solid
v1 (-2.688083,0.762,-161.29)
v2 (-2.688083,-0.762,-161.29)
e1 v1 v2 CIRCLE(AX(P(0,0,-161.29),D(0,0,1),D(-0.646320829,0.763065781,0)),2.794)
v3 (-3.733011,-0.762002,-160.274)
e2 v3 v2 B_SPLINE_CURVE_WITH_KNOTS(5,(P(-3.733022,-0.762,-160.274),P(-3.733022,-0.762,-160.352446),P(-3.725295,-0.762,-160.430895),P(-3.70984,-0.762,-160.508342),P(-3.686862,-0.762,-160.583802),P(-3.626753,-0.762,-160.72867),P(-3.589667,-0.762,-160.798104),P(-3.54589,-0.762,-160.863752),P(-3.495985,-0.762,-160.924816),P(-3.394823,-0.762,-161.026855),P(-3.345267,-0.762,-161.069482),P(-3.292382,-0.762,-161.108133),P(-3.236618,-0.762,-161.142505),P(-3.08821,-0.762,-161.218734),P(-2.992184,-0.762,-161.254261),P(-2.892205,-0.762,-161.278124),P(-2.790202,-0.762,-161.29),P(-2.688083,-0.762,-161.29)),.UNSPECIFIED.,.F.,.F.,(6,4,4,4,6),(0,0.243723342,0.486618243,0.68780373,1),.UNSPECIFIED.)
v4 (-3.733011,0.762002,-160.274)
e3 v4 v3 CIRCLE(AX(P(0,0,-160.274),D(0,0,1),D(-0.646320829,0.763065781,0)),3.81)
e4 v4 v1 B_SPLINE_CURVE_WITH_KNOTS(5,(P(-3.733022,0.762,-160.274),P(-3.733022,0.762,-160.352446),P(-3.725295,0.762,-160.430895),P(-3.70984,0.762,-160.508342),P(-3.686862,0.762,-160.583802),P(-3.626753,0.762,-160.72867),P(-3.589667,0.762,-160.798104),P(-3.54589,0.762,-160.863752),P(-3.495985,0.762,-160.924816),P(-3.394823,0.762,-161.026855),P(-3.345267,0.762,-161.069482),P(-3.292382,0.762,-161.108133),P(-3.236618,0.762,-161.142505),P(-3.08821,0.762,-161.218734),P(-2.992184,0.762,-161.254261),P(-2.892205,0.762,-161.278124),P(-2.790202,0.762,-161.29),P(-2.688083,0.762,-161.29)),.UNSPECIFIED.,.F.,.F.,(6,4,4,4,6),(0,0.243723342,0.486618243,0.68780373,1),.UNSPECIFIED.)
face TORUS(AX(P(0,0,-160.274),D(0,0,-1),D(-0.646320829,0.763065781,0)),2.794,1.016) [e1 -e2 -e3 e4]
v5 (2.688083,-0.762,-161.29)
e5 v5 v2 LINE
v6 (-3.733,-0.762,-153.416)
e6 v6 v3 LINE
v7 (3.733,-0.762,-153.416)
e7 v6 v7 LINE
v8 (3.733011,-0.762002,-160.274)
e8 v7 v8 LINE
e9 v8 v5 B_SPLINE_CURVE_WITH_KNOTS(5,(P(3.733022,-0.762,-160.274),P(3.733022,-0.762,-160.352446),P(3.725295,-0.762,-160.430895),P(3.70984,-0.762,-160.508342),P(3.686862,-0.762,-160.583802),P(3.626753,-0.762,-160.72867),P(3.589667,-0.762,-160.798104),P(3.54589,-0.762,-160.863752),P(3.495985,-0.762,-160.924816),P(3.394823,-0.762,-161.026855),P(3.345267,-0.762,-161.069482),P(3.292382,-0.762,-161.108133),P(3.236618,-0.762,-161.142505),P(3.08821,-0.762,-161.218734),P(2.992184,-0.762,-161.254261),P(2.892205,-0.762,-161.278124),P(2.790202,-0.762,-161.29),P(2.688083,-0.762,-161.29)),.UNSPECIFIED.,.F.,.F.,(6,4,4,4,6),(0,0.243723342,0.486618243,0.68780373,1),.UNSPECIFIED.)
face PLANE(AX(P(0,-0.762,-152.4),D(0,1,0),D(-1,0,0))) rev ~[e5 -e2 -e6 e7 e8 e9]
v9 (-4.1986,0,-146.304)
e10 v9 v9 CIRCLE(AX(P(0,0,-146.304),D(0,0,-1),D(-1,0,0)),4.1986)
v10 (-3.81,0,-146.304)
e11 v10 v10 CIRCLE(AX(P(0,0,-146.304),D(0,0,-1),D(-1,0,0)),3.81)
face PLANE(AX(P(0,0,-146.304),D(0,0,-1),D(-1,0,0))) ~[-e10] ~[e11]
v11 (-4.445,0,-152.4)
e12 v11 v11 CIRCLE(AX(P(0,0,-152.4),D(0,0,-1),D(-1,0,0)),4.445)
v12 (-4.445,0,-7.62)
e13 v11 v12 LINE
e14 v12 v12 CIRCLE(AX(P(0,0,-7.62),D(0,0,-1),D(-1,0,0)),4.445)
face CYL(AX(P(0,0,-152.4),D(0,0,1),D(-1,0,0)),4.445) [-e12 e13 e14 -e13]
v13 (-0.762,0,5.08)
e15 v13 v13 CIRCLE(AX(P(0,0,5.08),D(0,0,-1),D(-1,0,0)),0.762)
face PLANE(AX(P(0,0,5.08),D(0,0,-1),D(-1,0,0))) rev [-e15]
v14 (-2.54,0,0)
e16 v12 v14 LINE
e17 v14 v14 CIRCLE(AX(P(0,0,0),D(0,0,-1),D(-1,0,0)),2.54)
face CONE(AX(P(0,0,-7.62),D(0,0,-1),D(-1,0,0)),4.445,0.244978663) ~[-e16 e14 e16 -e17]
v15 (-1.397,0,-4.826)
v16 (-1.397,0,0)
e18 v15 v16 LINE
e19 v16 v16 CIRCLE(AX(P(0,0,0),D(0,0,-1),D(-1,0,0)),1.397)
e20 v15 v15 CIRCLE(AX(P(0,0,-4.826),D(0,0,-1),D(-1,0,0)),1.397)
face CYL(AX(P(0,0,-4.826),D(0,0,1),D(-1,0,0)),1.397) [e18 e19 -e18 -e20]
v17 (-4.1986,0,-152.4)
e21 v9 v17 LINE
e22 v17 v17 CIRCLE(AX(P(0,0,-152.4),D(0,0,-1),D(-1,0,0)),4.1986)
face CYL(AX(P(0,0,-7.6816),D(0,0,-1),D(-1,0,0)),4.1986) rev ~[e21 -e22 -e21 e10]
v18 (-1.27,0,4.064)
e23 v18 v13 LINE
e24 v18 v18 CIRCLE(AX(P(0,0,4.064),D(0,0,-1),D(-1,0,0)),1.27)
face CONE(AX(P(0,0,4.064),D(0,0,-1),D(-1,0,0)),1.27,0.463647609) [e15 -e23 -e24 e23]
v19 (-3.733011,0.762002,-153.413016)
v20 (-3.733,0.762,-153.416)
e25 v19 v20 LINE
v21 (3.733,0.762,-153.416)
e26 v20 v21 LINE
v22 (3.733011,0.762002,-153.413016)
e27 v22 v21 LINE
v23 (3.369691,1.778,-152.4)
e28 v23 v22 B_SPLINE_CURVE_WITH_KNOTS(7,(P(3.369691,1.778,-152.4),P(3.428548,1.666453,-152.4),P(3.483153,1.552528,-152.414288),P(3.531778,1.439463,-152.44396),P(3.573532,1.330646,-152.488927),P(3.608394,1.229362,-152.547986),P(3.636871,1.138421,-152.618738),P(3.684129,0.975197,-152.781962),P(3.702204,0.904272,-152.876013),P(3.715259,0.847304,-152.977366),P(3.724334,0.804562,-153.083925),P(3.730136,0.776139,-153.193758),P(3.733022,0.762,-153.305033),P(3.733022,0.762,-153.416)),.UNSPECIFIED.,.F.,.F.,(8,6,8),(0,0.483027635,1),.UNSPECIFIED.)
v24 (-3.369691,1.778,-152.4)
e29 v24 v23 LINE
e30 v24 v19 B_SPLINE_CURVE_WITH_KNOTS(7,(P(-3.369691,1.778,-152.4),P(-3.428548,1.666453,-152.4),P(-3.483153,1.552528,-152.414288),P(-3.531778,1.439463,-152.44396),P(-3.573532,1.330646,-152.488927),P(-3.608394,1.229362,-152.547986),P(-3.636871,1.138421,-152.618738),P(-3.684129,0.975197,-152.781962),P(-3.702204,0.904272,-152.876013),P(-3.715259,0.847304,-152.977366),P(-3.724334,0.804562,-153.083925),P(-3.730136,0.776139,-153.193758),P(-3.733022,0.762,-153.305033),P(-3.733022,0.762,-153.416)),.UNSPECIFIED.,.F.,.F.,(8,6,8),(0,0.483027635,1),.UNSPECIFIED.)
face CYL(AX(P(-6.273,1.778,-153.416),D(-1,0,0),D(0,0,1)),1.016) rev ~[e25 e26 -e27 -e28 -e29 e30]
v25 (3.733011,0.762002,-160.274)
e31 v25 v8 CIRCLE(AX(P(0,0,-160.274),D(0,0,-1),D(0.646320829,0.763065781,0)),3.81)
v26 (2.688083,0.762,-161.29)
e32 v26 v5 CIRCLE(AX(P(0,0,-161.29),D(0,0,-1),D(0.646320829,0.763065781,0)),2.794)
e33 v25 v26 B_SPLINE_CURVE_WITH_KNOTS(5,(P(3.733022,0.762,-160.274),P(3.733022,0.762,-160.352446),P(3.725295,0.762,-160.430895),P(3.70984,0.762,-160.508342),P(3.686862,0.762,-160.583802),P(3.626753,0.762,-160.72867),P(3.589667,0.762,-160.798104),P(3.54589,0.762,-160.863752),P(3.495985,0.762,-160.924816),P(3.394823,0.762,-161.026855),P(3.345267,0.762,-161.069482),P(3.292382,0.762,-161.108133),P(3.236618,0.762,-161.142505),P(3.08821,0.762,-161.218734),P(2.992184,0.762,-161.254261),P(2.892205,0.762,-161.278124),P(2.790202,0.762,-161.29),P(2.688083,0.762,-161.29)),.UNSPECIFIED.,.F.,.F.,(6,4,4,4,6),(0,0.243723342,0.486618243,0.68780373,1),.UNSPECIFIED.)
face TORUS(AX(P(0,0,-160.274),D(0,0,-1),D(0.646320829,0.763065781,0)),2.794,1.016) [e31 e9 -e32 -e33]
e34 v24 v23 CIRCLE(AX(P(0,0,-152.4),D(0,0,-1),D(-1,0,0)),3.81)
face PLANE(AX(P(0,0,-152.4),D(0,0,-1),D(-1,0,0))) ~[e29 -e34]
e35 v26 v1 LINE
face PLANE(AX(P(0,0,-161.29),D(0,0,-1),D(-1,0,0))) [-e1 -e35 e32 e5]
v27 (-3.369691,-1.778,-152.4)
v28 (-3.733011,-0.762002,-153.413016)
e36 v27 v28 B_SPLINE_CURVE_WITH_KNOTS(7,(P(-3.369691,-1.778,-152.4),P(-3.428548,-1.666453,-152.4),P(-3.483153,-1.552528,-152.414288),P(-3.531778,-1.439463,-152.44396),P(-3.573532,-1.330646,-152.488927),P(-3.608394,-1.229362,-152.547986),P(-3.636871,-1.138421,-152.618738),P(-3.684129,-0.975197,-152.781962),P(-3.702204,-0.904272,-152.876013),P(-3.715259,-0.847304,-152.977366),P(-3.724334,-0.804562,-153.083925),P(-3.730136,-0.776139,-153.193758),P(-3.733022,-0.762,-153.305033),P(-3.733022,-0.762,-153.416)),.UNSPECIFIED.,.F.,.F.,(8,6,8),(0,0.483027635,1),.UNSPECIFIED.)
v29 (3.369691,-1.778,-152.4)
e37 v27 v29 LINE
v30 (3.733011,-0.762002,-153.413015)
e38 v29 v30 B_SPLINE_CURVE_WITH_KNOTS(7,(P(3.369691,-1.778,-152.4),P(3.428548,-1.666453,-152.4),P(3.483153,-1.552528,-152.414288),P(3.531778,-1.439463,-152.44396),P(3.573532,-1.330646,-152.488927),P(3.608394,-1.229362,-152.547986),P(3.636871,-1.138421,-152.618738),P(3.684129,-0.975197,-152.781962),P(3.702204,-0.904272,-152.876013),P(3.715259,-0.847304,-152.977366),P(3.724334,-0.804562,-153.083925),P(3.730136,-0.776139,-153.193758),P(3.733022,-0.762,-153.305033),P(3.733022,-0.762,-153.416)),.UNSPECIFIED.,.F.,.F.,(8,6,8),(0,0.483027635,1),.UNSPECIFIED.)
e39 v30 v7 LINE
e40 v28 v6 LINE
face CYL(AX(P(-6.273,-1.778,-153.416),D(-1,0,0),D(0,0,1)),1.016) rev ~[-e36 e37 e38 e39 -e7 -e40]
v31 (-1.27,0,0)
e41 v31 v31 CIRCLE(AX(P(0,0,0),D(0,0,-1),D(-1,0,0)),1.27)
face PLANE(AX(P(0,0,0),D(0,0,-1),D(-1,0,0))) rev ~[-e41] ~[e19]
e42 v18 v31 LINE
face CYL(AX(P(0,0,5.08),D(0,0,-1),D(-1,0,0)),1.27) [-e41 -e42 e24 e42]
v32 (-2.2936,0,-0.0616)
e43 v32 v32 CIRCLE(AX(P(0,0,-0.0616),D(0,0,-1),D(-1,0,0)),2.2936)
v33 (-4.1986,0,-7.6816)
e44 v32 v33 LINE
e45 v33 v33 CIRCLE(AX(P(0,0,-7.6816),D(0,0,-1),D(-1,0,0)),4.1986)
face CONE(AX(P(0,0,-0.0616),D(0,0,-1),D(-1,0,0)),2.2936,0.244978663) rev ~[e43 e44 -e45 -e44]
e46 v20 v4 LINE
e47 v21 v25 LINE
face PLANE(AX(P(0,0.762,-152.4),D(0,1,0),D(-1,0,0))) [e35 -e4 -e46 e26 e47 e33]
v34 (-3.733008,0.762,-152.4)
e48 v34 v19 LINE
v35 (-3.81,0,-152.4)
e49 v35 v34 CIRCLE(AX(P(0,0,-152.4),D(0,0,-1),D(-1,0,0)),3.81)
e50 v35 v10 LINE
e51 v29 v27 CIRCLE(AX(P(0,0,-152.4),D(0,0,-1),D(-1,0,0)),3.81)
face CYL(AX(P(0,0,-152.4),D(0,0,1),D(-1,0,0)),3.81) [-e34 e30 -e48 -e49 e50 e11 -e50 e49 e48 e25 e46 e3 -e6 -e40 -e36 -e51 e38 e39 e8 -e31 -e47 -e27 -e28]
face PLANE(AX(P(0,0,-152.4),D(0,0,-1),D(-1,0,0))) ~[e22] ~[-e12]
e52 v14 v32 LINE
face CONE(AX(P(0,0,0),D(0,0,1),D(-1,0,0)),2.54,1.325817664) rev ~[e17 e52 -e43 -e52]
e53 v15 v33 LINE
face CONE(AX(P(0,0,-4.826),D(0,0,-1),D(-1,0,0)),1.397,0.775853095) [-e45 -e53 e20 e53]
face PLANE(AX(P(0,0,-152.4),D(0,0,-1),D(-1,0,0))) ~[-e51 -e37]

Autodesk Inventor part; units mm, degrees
ref_plane "YZ Plane" through (0, 0, 0) normal (1, 0, 0) x (0, 1, 0)
ref_plane "XZ Plane" through (0, 0, 0) normal (0, 1, 0) x (-1, 0, 0)
ref_plane "XY Plane" through (0, 0, 0) normal (0, 0, 1) x (1, 0, 0)
sketch "Sketch1" plane through (0, 0, 0) normal (0, 1, 0) x (-1, 0, 0)
  line L0 (0, 0) -> (0, -152.4)
  line L1 (0, 0) -> (0, 5.08)
  line L2 (0, 5.08) -> (1.27, 5.08)
  line L3 (1.27, 5.08) -> (1.27, 0)
  line L4 (1.27, 0) -> (0, 0)
  line L5 (0, 0) -> (0, -4.826)
  line L6 (0, -4.826) -> (1.397, -4.826)
  line L7 (1.397, -4.826) -> (1.397, 0)
  line L8 (1.397, 0) -> (1.27, 0)
  line L9 (0, 0) -> (0, -7.62)
  line L10 (4.445, -7.62) -> (2.54, 0)
  line L11 (4.445, -152.4) -> (4.445, -7.62)
  line L12 (2.54, 0) -> (2.2936, -0.0616)
  line L13 (2.2936, -0.0616) -> (4.1986, -7.6816)
  line L14 (4.1986, -7.6816) -> (4.1986, -152.4)
  line L15 (4.1986, -152.4) -> (4.445, -152.4)
  line L16 (1.397, -4.826) -> (4.1986, -7.6816)
  line L17 (0, -152.4) -> (3.81, -152.4)
  line L18 (3.81, -152.4) -> (3.81, -146.304)
  line L19 (3.81, -146.304) -> (0, -146.304)
  line L20 (3.81, -146.304) -> (4.445, -146.304)
  dimension "d0" = 152.4
  dimension "d1" = 5.08
  dimension "d2" = 1.27
  dimension "d3" = 4.826
  dimension "d4" = 1.397
  dimension "d5" = 2.54
  dimension "d6" = 7.62
  dimension "d7" = 4.445
  dimension "d8" = 4.445
  dimension "d9" = 0.254
  dimension "d10" = 3.81
  dimension "d11" = 6.096
  dimension "d21" = 0.2464
revolve "Revolution1" add sketch "Sketch1" angle 360 about axis through (0, 0, 0) along (0, 0, -1)
sketch "Sketch2" plane through (0, 0, -152.4) normal (0, 0, -1) x (-1, 0, 0)
  line L0 (0, 0) -> (0, -0.762)
  line L1 (0, -0.762) -> (3.733, -0.762)
  circle A0 centre (0, 0) radius 3.81 projected
  line L2 (0, -0.762) -> (-3.733, -0.762)
  line L3 (0, 0) -> (0, 0.762)
  line L4 (0, 0.762) -> (3.733, 0.762)
  line L5 (0, 0.762) -> (-3.733, 0.762)
  dimension "d13" = 0.762
  dimension "d14" = 0.762
extrude "Extrusion1" add sketch "Sketch2" along normal blind 8.89 contours L3 L4 A0 L1 L0 | L0 L2 A0 L5 L3
fillet "Fillet1" radius 1.016 4 edges at (-3.81, 0, -161.29) (3.81, 0, -161.29) (0, 0.762, -152.4) (0, -0.762, -152.4)
chamfer "Chamfer1" distance 1.016 distance2 0.508 1 edges at (1.27, 0, 5.08) measured on face at (-1.2659, -0.1022, 1.6933)
sketch "Sketch3" plane through (-3.733, -0.762, -153.416) normal (0, -1, 0) x (1, 0, 0)
  point P0 (3.733, 153.416)
properties part number "Pencil Body"
